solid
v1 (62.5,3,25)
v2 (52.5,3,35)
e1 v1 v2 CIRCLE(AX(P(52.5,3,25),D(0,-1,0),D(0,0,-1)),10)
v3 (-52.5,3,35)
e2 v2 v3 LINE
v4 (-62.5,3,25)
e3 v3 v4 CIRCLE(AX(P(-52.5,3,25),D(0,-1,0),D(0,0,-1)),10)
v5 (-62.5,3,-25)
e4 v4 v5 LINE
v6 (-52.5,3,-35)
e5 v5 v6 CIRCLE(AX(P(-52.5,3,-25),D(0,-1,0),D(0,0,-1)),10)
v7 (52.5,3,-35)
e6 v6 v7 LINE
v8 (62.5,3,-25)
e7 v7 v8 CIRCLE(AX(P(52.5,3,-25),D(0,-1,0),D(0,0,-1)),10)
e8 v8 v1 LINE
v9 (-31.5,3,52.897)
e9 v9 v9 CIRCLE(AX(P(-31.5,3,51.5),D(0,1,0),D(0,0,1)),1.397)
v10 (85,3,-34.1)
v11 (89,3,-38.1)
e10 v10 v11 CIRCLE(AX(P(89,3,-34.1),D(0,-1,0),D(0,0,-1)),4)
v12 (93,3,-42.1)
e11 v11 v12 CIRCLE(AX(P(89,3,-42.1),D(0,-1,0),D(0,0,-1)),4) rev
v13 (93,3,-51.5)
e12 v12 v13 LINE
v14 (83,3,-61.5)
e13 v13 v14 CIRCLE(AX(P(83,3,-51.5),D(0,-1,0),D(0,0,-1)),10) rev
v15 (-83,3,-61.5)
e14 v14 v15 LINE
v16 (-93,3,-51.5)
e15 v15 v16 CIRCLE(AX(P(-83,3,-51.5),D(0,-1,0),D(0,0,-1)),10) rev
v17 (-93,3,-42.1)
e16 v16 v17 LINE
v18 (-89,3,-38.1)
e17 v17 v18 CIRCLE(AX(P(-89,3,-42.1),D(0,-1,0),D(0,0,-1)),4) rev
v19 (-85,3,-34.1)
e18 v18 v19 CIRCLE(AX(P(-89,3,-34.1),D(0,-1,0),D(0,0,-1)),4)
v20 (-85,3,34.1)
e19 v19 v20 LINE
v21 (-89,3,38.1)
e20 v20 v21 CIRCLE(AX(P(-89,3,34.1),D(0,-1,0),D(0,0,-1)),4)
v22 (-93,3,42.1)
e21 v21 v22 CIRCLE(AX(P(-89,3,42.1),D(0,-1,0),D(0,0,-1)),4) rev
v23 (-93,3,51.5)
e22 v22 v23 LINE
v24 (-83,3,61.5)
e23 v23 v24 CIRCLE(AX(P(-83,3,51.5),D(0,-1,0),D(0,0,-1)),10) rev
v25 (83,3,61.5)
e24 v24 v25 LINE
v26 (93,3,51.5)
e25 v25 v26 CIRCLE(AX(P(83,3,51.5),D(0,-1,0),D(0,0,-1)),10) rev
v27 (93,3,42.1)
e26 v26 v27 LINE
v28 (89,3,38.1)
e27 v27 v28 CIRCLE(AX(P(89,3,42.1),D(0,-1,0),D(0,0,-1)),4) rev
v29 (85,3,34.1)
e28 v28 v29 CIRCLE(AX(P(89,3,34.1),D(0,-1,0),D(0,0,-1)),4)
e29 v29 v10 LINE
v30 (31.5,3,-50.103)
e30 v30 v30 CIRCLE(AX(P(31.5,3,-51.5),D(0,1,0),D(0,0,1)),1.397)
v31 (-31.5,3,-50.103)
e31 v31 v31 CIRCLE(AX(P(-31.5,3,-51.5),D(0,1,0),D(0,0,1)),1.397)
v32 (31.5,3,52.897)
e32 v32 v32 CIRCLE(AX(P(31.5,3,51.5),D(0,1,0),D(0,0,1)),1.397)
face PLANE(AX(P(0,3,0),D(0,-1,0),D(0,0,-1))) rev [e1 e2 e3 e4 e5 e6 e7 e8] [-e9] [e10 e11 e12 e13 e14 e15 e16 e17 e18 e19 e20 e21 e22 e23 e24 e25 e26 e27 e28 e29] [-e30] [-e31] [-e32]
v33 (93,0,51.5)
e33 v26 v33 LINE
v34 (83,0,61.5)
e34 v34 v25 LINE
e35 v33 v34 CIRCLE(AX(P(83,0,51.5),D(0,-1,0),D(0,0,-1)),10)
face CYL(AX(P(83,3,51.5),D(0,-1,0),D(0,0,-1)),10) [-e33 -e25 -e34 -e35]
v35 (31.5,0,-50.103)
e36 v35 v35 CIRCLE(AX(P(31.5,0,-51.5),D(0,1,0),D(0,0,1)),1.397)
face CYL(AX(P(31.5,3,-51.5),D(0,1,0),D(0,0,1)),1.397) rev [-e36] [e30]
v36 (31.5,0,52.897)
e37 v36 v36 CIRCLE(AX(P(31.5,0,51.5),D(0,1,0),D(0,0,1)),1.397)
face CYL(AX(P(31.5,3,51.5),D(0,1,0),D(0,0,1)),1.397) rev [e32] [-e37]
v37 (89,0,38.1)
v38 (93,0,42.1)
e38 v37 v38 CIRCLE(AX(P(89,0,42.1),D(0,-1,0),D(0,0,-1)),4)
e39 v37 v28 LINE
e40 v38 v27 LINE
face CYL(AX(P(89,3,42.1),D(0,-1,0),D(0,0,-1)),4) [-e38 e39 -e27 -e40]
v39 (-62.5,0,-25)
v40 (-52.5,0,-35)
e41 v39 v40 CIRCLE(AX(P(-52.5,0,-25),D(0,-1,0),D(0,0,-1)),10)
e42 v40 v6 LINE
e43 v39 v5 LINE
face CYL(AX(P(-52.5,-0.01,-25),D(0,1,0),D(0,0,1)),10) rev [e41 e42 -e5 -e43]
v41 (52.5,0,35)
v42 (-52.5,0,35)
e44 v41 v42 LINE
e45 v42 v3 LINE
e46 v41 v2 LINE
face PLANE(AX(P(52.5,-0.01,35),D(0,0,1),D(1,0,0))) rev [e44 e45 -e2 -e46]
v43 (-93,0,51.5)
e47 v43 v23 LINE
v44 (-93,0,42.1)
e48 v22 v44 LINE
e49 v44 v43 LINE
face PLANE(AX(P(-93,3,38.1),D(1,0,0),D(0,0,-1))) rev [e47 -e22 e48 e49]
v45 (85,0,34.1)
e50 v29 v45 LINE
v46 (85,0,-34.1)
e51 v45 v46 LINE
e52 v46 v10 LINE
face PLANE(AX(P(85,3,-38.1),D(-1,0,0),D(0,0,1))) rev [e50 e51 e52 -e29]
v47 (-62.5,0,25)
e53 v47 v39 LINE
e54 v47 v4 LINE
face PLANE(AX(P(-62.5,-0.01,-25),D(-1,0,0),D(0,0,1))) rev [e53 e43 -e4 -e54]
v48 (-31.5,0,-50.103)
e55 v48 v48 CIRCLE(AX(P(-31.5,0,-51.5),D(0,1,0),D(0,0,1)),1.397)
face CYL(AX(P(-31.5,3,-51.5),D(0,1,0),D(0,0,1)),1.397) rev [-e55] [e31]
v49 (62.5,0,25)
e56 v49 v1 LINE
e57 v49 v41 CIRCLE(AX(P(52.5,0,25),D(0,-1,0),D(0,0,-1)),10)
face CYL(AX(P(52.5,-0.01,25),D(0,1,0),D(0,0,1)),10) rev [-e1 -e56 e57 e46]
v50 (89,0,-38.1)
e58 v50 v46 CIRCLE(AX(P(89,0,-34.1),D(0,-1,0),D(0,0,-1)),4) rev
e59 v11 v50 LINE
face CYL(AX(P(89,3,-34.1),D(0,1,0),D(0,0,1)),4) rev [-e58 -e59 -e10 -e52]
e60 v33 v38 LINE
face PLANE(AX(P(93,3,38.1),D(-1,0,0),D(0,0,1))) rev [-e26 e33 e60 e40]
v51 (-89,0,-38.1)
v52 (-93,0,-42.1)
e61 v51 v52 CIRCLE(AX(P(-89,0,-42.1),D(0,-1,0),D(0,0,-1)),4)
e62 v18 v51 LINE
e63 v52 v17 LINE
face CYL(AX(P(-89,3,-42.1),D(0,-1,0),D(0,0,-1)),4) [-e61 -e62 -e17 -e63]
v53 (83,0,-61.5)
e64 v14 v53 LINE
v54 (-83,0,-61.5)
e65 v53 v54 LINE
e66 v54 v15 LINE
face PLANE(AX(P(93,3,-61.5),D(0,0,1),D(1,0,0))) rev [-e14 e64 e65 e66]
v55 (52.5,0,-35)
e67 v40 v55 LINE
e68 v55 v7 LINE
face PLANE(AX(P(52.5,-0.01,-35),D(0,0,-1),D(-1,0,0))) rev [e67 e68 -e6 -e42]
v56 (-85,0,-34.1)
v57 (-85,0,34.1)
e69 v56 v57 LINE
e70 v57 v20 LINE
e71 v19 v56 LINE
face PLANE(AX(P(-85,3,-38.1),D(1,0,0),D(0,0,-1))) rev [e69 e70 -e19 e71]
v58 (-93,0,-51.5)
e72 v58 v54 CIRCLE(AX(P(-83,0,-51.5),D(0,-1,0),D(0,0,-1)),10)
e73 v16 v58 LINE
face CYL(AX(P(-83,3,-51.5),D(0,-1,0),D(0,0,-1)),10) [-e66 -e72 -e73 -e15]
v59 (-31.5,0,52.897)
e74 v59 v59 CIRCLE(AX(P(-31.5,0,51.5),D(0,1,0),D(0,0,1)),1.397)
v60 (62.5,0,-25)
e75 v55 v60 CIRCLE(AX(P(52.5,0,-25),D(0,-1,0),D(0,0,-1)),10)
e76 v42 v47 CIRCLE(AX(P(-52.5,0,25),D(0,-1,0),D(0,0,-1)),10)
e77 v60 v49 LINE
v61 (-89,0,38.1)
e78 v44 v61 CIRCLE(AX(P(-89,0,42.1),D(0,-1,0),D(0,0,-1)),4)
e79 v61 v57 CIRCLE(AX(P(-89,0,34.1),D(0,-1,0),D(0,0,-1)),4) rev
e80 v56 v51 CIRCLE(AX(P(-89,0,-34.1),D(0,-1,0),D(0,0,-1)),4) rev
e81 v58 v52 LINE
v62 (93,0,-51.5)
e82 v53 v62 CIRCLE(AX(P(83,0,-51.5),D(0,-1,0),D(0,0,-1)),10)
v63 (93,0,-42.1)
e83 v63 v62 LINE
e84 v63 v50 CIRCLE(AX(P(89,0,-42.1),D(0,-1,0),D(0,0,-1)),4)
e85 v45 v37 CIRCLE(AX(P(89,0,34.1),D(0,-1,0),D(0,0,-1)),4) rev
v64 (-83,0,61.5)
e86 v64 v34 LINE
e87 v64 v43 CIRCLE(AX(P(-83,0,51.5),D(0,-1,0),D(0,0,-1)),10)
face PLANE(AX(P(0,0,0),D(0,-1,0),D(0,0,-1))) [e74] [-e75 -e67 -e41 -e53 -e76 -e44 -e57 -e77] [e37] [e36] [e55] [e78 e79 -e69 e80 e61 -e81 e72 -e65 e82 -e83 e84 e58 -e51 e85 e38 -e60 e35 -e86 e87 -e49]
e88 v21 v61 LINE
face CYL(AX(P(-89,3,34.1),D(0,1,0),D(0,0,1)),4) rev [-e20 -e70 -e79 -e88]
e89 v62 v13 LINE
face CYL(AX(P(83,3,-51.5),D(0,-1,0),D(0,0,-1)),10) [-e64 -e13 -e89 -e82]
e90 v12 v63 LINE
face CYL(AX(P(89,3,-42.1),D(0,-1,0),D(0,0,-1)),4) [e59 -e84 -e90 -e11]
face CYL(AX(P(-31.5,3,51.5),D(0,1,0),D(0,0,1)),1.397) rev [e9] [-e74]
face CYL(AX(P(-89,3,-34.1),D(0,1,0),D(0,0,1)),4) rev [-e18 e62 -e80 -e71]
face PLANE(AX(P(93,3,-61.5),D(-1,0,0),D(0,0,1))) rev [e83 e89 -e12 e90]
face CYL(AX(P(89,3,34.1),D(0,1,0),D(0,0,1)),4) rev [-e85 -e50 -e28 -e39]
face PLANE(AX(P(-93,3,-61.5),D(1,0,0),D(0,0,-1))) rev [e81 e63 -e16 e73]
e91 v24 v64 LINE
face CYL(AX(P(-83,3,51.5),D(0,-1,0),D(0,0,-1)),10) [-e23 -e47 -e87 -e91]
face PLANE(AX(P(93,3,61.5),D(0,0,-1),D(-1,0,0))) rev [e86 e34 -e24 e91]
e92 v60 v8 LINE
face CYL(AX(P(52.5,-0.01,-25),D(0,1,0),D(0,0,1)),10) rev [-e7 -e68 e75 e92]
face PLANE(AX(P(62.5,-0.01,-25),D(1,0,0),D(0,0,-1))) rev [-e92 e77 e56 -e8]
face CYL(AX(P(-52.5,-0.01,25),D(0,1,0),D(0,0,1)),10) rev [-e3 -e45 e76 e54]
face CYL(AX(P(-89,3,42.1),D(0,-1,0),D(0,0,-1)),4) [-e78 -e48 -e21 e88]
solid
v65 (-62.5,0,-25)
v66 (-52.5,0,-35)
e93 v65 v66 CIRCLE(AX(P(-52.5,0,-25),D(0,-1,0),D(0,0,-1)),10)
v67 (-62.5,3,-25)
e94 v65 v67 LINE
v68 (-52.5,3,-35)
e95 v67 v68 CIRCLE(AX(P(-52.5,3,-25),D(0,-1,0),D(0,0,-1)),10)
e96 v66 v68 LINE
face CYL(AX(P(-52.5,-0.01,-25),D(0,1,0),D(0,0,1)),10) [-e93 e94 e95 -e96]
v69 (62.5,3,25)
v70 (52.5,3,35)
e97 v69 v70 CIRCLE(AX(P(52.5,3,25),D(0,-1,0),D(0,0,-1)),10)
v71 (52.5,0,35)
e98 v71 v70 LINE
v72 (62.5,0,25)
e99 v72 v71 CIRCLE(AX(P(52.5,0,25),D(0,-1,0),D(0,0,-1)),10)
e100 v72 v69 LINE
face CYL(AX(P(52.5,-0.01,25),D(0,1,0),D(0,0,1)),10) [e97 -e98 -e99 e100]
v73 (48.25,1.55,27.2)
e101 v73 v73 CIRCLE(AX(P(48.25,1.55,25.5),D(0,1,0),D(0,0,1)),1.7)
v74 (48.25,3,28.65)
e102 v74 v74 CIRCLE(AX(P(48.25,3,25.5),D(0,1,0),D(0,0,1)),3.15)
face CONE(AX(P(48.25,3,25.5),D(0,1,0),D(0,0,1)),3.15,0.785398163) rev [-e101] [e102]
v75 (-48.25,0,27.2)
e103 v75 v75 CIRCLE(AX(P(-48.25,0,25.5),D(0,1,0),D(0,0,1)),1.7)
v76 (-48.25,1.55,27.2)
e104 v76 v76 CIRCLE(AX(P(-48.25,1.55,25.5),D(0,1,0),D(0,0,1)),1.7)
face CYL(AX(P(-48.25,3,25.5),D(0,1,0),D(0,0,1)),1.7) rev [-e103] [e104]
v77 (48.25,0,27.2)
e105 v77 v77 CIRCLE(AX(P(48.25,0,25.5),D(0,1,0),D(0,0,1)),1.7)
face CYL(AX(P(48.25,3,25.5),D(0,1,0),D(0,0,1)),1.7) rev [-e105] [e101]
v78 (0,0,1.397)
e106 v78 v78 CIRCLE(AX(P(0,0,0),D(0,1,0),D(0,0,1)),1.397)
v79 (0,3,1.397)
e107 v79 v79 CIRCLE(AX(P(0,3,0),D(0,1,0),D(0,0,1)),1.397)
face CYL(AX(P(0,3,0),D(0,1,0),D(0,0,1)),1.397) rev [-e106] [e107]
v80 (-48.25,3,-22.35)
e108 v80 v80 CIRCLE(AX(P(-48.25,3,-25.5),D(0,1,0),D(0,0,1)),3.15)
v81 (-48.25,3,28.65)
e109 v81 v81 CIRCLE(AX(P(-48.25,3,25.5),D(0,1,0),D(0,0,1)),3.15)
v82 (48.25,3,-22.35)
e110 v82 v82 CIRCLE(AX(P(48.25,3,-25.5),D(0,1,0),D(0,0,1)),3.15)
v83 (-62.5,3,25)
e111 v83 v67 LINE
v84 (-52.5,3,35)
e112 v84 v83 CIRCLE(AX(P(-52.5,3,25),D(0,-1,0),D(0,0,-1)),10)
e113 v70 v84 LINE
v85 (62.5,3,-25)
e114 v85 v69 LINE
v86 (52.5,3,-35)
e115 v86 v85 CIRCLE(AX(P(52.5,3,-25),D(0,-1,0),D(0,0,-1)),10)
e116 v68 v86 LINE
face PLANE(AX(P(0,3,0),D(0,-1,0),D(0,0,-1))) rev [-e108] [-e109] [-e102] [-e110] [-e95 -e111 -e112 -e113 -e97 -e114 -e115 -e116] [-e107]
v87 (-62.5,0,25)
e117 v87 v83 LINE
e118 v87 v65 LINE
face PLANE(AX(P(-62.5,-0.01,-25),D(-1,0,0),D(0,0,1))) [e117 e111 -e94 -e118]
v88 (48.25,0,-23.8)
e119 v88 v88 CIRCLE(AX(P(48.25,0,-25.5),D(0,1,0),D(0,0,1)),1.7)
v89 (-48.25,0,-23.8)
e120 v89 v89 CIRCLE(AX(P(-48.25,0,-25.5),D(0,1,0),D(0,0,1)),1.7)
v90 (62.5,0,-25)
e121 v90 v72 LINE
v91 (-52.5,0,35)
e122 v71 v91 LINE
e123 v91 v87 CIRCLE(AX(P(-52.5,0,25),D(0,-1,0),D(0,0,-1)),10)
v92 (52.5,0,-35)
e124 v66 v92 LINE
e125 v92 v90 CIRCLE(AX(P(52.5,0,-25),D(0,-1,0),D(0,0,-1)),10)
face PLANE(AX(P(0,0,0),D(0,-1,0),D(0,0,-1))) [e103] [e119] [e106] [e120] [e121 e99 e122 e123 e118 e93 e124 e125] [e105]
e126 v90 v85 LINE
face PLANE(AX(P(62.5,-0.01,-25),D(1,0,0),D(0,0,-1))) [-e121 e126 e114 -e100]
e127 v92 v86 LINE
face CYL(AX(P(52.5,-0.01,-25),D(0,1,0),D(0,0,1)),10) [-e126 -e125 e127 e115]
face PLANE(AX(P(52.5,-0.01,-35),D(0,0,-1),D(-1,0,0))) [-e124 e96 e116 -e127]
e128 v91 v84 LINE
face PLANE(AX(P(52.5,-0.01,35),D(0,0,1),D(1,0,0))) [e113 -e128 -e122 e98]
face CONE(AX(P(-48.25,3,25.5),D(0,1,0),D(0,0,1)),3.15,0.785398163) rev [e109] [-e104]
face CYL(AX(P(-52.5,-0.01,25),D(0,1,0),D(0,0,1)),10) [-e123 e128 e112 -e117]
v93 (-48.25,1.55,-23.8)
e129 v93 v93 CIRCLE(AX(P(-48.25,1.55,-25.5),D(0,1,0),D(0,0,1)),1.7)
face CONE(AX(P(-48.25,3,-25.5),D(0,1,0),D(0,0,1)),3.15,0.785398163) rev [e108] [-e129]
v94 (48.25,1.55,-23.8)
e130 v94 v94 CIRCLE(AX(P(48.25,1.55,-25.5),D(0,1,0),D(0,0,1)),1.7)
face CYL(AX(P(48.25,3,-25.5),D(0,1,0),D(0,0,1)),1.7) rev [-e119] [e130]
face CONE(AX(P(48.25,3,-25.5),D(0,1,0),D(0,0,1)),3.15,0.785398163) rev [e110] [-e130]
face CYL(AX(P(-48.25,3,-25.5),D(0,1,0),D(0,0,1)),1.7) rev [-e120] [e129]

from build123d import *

# Parameters (mm, degrees)
BOSS_EXTRUDE1_DEPTH                            = 3
CSK_FOR_M3_FLAT_HEAD_MACHINE_SCREW1_AT_2_COUNT = 2
CSK_FOR_M3_FLAT_HEAD_MACHINE_SCREW1_AT_2_PITCH = 96.5
CSK_FOR_M3_FLAT_HEAD_MACHINE_SCREW1_AT_3_COUNT = 2
CSK_FOR_M3_FLAT_HEAD_MACHINE_SCREW1_AT_3_PITCH = 109.147835526
CSK_FOR_M3_FLAT_HEAD_MACHINE_SCREW1_AT_4_COUNT = 2
CSK_FOR_M3_FLAT_HEAD_MACHINE_SCREW1_AT_4_PITCH = 51
F_3_CLEARANCE_HOLE2_D                          = 2.794
FILLET1_R                                      = 10
FILLET2_START                                  = -1
FILLET2_DEPTH                                  = 5
FILLET2_2_DEPTH                                = 3
SPLIT2_SURFACE_1_BACK                          = 224.011
SPLIT2_SURFACE_1_DEPTH                         = 448.022
SPLIT2_SURFACE_2_BACK                          = 224.011
SPLIT2_SURFACE_2_DEPTH                         = 448.022


with BuildPart() as part:
    # Boss-Extrude1: read off the stored shape, not the designer's step
    # Boss-Extrude1 outline → Boss-Extrude1 (new body)
    with BuildSketch(Plane(origin=(0, 0, 0), x_dir=(1, 0, 0), z_dir=(0, 1, 0))):
        Polygon((-93, -38.1), (-93, -61.5), (93, -61.5), (93, -38.1), (85, -38.1), (85, 38.1), (93, 38.1), (93, 61.5), (-93, 61.5), (-93, 38.1), (-85, 38.1), (-85, -38.1), align=None)
    extrude(amount=BOSS_EXTRUDE1_DEPTH)

    # Sketch3 → CSK for M3 Flat Head Machine Screw1 (revolve, cut)
    with BuildSketch(Plane(origin=(-48.25, 3, -25.5), x_dir=(0, 0, 1), z_dir=(1, 0, 0))):
        Polygon((0, 0), (0, 3), (1.7, 3), (1.7, 1.45), (3.15, 0), align=None)
    csk_for_m3_flat_head_machine_screw1 = revolve(axis=Axis((-48.25, 9.35, -25.5), (0, -1, 0)), mode=Mode.SUBTRACT)

    # CSK for M3 Flat Head Machine Screw1 at 2: CSK for M3 Flat Head Machine Screw1 ×2
    with Locations(*[(i * CSK_FOR_M3_FLAT_HEAD_MACHINE_SCREW1_AT_2_PITCH, 0, 0) for i in range(1, CSK_FOR_M3_FLAT_HEAD_MACHINE_SCREW1_AT_2_COUNT)]):
        add(csk_for_m3_flat_head_machine_screw1, mode=Mode.SUBTRACT)

    # CSK for M3 Flat Head Machine Screw1 at 3: CSK for M3 Flat Head Machine Screw1 ×2
    with Locations(*[Vector(0.8841219758046083, 0, 0.4672561737412956) * (i * CSK_FOR_M3_FLAT_HEAD_MACHINE_SCREW1_AT_3_PITCH) for i in range(1, CSK_FOR_M3_FLAT_HEAD_MACHINE_SCREW1_AT_3_COUNT)]):
        add(csk_for_m3_flat_head_machine_screw1, mode=Mode.SUBTRACT)

    # CSK for M3 Flat Head Machine Screw1 at 4: CSK for M3 Flat Head Machine Screw1 ×2
    with Locations(*[(0, 0, i * CSK_FOR_M3_FLAT_HEAD_MACHINE_SCREW1_AT_4_PITCH) for i in range(1, CSK_FOR_M3_FLAT_HEAD_MACHINE_SCREW1_AT_4_COUNT)]):
        add(csk_for_m3_flat_head_machine_screw1, mode=Mode.SUBTRACT)

    # #3 Clearance Hole2 (through all)
    with Locations(Plane(origin=(0, 3, 0), x_dir=(1, 0, 0), z_dir=(0, 1, 0))):
        with Locations((-31.5, 51.5), (31.5, 51.5), (31.5, -51.5), (-31.5, -51.5), (0, 0)):
            Hole(F_3_CLEARANCE_HOLE2_D / 2)

    # Fillet1
    fillet1_edges = [part.edges().sort_by_distance(p)[0] for p in [
        (-93, 1.5, -61.5),
        (93, 1.5, -61.5),
        (93, 1.5, 61.5),
        (-93, 1.5, 61.5),
    ]]
    fillet(fillet1_edges, radius=FILLET1_R)

    # Fillet2: read off the stored shape, not the designer's step
    # Fillet2 outline → Fillet2 (cut)
    with BuildSketch(Plane(origin=(0, 0, 0), x_dir=(1, 0, 0), z_dir=(0, 1, 0)).offset(FILLET2_START)):
        with BuildLine():
            Line((-93, 38.1), (-89, 38.1))
            ThreePointArc((-89, 38.1), (-91.828427125, 39.271572875), (-93, 42.1))
            Line((-93, 42.1), (-93, 38.1))
        make_face()
        with BuildLine():
            ThreePointArc((-93, -42.1), (-91.828427125, -39.271572875), (-89, -38.1))
            Line((-89, -38.1), (-93, -38.1))
            Line((-93, -38.1), (-93, -42.1))
        make_face()
        with BuildLine():
            Line((93, -38.1), (89, -38.1))
            ThreePointArc((89, -38.1), (91.828427125, -39.271572875), (93, -42.1))
            Line((93, -42.1), (93, -38.1))
        make_face()
        with BuildLine():
            ThreePointArc((93, 42.1), (91.828427125, 39.271572875), (89, 38.1))
            Line((89, 38.1), (93, 38.1))
            Line((93, 38.1), (93, 42.1))
        make_face()
    extrude(amount=FILLET2_DEPTH, mode=Mode.SUBTRACT)

    # Fillet2 2 outline → Fillet2 2 (add)
    with BuildSketch(Plane(origin=(0, 0, 0), x_dir=(1, 0, 0), z_dir=(0, 1, 0))):
        with BuildLine():
            ThreePointArc((-89, 38.1), (-86.171572875, 36.928427125), (-85, 34.1))
            Line((-85, 34.1), (-85, 38.1))
            Line((-85, 38.1), (-89, 38.1))
        make_face()
        with BuildLine():
            ThreePointArc((-85, -34.1), (-86.171572875, -36.928427125), (-89, -38.1))
            Line((-89, -38.1), (-85, -38.1))
            Line((-85, -38.1), (-85, -34.1))
        make_face()
        with BuildLine():
            ThreePointArc((89, -38.1), (86.171572875, -36.928427125), (85, -34.1))
            Line((85, -34.1), (85, -38.1))
            Line((85, -38.1), (89, -38.1))
        make_face()
        with BuildLine():
            ThreePointArc((85, 34.1), (86.171572875, 36.928427125), (89, 38.1))
            Line((89, 38.1), (85, 38.1))
            Line((85, 38.1), (85, 34.1))
        make_face()
    extrude(amount=FILLET2_2_DEPTH)


with BuildPart() as body_2:
    # Split2: the piece behind the surface
    add(part.part)
    # Split2 surface: a surface, the sketch's curves swept straight by 448.022 mm
    with BuildLine(Plane(origin=(0, 3, 0), x_dir=(1, 0, 0), z_dir=(0, 1, 0)).offset(-SPLIT2_SURFACE_1_BACK), mode=Mode.PRIVATE) as split2_surface_1_path:
        Line((52.5, 35), (-52.5, 35))
        ThreePointArc((-52.5, 35), (-59.571067812, 32.071067812), (-62.5, 25))
        Line((-62.5, 25), (-62.5, -25))
        ThreePointArc((-62.5, -25), (-59.571067812, -32.071067812), (-52.5, -35))
        Line((-52.5, -35), (52.5, -35))
        ThreePointArc((52.5, -35), (59.571067812, -32.071067812), (62.5, -25))
        Line((62.5, -25), (62.5, 25))
        ThreePointArc((62.5, 25), (59.571067812, 32.071067812), (52.5, 35))
    split2_surface_1 = Shell.extrude(split2_surface_1_path.wire(), (0 * SPLIT2_SURFACE_1_DEPTH, 1 * SPLIT2_SURFACE_1_DEPTH, 0 * SPLIT2_SURFACE_1_DEPTH))
    split(bisect_by=split2_surface_1, keep=Keep.BOTTOM)


with BuildPart() as part_1:
    add(part.part)

    # Split2: split by a surface, the side it looks to stays
    # Split2 surface: a surface, the sketch's curves swept straight by 448.022 mm
    with BuildLine(Plane(origin=(0, 3, 0), x_dir=(1, 0, 0), z_dir=(0, 1, 0)).offset(-SPLIT2_SURFACE_2_BACK), mode=Mode.PRIVATE) as split2_surface_2_path:
        Line((52.5, 35), (-52.5, 35))
        ThreePointArc((-52.5, 35), (-59.571067812, 32.071067812), (-62.5, 25))
        Line((-62.5, 25), (-62.5, -25))
        ThreePointArc((-62.5, -25), (-59.571067812, -32.071067812), (-52.5, -35))
        Line((-52.5, -35), (52.5, -35))
        ThreePointArc((52.5, -35), (59.571067812, -32.071067812), (62.5, -25))
        Line((62.5, -25), (62.5, 25))
        ThreePointArc((62.5, 25), (59.571067812, 32.071067812), (52.5, 35))
    split2_surface_2 = Shell.extrude(split2_surface_2_path.wire(), (0 * SPLIT2_SURFACE_2_DEPTH, 1 * SPLIT2_SURFACE_2_DEPTH, 0 * SPLIT2_SURFACE_2_DEPTH))
    split(bisect_by=split2_surface_2, keep=Keep.TOP)


solid = Compound([body_2.part, part_1.part])
